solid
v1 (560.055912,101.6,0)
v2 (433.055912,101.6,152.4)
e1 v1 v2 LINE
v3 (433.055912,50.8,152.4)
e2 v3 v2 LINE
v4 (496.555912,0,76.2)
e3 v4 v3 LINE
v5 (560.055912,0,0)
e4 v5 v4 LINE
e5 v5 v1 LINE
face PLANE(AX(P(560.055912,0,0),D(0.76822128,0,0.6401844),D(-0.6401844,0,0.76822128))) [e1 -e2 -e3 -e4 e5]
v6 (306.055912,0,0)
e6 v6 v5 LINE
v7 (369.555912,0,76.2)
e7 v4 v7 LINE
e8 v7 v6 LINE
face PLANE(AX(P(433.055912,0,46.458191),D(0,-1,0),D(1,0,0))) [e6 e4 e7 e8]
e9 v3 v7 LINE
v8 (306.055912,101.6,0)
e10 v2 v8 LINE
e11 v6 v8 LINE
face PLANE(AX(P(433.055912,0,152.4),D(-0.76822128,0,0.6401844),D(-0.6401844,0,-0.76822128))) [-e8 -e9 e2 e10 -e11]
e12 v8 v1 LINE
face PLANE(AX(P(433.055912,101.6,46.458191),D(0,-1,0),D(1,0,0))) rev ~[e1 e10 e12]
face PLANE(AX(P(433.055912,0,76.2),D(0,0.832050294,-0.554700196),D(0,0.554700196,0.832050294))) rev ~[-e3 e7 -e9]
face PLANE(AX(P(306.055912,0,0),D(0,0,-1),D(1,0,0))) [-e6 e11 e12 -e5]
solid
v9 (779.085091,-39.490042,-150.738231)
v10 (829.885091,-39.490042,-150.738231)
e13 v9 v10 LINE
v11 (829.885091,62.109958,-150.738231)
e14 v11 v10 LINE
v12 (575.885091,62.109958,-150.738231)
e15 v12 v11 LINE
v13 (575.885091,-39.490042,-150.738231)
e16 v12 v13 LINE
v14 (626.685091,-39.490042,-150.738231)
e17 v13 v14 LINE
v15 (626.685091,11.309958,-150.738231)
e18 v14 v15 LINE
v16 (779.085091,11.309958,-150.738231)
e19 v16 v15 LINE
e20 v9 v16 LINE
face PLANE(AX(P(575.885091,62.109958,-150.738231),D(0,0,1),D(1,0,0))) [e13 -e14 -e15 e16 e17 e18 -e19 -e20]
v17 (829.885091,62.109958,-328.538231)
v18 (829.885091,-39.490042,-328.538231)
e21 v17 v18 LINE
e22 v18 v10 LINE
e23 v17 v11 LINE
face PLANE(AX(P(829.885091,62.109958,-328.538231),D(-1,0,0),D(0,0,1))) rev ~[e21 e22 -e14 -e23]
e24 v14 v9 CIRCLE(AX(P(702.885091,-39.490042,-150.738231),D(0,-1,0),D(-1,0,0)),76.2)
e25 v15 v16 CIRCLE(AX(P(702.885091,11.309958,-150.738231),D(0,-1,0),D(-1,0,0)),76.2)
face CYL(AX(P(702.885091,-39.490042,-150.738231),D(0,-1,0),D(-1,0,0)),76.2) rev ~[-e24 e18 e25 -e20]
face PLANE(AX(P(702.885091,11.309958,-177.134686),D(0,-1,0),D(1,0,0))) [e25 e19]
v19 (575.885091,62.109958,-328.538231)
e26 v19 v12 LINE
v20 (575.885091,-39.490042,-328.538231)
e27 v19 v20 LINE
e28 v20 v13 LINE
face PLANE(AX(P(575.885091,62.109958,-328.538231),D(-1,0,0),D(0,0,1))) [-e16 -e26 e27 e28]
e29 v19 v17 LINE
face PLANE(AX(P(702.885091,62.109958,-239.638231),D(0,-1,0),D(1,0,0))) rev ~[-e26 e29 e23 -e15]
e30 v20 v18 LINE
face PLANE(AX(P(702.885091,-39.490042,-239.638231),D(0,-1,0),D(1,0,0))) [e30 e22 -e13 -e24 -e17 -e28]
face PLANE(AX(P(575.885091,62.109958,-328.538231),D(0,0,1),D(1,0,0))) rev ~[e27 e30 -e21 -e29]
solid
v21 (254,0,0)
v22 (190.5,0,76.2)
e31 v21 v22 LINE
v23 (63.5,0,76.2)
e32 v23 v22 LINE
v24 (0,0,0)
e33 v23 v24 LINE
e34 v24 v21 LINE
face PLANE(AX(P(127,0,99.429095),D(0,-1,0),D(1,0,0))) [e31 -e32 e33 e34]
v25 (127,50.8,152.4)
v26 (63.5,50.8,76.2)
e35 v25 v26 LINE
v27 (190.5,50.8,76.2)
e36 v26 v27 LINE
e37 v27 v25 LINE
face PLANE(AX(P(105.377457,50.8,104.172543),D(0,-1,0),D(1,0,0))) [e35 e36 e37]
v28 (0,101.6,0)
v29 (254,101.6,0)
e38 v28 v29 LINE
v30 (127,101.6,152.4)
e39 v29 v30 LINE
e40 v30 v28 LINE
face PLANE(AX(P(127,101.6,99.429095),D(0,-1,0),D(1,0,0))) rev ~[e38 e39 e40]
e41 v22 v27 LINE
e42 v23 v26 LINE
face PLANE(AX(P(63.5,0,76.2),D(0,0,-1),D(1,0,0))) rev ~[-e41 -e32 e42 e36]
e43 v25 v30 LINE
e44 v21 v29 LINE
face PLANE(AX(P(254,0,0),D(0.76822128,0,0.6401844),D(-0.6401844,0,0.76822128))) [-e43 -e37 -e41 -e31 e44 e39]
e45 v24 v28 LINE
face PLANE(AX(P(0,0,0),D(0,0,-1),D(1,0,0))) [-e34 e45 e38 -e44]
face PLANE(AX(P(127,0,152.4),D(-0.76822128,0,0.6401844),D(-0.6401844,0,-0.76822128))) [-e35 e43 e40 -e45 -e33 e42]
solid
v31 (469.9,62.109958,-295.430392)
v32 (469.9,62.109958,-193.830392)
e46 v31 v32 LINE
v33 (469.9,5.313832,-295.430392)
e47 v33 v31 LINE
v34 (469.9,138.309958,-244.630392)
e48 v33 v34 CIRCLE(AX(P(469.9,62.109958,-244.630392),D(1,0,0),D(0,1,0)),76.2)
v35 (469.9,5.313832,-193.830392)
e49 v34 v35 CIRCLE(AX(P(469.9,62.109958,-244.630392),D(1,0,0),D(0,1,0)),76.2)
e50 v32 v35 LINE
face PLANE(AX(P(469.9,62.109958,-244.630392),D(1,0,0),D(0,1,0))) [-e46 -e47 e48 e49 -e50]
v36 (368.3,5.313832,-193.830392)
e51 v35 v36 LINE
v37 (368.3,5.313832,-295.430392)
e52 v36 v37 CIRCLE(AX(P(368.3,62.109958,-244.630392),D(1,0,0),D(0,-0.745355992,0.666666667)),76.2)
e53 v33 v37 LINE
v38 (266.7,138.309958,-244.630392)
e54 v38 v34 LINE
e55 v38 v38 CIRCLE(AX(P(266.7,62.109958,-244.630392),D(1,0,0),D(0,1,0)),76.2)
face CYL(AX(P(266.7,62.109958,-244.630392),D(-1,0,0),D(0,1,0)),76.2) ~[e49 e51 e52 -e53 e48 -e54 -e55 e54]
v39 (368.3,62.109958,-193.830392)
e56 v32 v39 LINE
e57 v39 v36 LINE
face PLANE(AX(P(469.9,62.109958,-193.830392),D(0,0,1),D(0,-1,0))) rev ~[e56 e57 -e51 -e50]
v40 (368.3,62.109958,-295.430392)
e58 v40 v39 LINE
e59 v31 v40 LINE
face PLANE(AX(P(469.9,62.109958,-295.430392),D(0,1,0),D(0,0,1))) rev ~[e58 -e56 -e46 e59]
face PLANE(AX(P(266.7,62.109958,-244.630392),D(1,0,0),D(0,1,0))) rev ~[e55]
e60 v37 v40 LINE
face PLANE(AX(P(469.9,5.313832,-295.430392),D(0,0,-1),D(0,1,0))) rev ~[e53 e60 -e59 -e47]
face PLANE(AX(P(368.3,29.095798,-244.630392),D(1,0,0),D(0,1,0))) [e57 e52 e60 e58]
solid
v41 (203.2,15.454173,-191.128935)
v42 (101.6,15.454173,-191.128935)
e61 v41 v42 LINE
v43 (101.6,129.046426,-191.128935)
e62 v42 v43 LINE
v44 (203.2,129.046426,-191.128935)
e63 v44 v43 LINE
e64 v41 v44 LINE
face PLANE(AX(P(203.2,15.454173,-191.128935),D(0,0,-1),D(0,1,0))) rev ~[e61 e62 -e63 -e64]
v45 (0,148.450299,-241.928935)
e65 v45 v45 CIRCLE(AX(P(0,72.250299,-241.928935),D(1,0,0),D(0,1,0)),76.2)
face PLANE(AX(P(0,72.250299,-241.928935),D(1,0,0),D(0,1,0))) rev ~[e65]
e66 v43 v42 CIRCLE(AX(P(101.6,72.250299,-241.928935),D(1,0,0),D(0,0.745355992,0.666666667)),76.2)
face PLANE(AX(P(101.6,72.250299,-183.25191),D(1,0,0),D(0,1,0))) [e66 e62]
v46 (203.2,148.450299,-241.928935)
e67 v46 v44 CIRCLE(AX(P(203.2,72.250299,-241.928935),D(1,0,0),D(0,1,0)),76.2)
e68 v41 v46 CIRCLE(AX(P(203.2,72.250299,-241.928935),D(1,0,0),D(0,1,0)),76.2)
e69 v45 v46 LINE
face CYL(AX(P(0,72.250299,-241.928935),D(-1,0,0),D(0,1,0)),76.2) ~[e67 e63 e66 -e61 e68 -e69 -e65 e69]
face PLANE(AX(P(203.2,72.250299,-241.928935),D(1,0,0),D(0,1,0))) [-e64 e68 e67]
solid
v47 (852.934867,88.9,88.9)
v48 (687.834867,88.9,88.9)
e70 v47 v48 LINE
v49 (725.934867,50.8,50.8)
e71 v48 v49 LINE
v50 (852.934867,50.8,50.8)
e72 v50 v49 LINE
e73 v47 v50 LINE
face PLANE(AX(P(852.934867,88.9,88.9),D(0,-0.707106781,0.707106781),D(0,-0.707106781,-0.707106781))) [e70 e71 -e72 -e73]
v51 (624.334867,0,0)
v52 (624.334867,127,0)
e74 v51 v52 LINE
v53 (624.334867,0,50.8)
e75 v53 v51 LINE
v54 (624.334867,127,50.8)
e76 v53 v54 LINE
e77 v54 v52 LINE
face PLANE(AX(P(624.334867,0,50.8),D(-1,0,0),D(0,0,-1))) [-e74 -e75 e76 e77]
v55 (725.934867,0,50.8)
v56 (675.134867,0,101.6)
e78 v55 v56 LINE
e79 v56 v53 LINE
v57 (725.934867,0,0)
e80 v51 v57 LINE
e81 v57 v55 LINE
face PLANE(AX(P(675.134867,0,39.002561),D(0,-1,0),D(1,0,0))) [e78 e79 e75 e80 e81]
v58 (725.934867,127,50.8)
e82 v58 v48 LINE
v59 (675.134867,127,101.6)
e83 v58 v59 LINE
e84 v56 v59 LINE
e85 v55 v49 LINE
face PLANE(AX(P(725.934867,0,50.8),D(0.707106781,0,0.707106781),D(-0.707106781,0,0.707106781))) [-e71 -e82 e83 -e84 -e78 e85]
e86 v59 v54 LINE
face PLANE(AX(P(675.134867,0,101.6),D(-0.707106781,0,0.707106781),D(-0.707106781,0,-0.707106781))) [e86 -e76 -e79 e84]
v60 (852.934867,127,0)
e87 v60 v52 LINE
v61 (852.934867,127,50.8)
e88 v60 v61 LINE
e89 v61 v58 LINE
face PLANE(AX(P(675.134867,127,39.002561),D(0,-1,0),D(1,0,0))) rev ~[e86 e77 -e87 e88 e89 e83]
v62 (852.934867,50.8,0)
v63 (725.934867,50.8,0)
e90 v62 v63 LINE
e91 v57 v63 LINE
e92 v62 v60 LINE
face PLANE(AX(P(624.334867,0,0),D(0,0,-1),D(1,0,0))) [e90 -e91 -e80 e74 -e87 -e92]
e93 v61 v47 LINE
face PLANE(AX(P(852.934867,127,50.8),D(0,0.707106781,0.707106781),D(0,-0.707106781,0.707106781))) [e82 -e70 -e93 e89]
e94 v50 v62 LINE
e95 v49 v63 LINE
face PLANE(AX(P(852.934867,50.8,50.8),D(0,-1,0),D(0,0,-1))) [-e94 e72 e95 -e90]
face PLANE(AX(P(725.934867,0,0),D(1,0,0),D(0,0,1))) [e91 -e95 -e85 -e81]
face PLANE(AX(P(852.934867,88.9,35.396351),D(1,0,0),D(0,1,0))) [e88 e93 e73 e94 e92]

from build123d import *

# Parameters (mm, degrees)
F1_DEPTH  = 101.6
F3_DEPTH  = 50.8
F5_DEPTH  = 101.6
F9_DEPTH  = 63.5
F11_DEPTH = 127
F15_R     = 76.2
F16_DEPTH = 203.2
F18_DEPTH = 101.6
F20_R     = 76.2
F21_DEPTH = 203.2
F23_DEPTH = 101.6
F24_W     = 254
F24_H     = 177.8
F25_DEPTH = 101.6
F27_DEPTH = 50.8


# Not quite as in the source:
# - a feature names something its author has since deleted; it is built from what else it names


with BuildPart() as f1:
    # F0 (on Front) → F1 (new body)
    with BuildSketch(Plane.XZ):
        Polygon((63.5, 76.2), (190.5, 76.2), (127, 152.4), align=None)
        Polygon((0, 0), (254, 0), (190.5, 76.2), (63.5, 76.2), align=None)
    extrude(amount=-F1_DEPTH)

    # F2 (on face) → F3 (cut)
    with BuildSketch(Plane.XZ):
        Polygon((127, 76.2), (127, 152.4), (63.5, 76.2), align=None)
        Polygon((190.5, 76.2), (127, 152.4), (127, 76.2), align=None)
    extrude(amount=-F3_DEPTH, mode=Mode.SUBTRACT)


with BuildPart() as f5:
    # F4 (on face) → F5 (new body)
    with BuildSketch(Plane.XZ):
        Polygon((306.055911541, 0), (560.055911541, 0), (433.055911541, 152.4), align=None)
    extrude(amount=-F5_DEPTH)

    # F8 (on 3pt) → F9 (cut, symmetric)
    with BuildSketch(Plane.YZ.offset(433.055911541)):
        Polygon((50.8, 152.4), (0, 152.4), (0, 76.2), align=None)
    extrude(amount=F9_DEPTH, both=True, mode=Mode.SUBTRACT)


with BuildPart() as f11:
    # F10 (on face) → F11 (new body)
    with BuildSketch(Plane.XZ):
        Polygon((675.1348665619, 101.6), (624.3348665619, 50.8), (624.3348665619, 0), (725.9348665619, 0), (725.9348665619, 50.8), align=None)
    extrude(amount=-F11_DEPTH)

    # F13 (on offset) → F14 (join, up to the next surface of F11)
    with BuildSketch(Plane.YZ.offset(852.9348665619)):
        Polygon((50.8, 50.8), (50.8, 0), (127, 0), (127, 50.8), (88.9, 88.9), align=None)
    extrude(until=Until.NEXT, dir=(-1, 0, 0))


with BuildPart() as f16:
    # F15 (on Right) → F16 (new body)
    with BuildSketch(Plane.YZ):
        with Locations((72.2502991557, -241.928935051)):
            Circle(F15_R)
    extrude(amount=F16_DEPTH)

    # F17 (on face) → F18 (cut)
    with BuildSketch(Plane.YZ.offset(203.2)):
        with BuildLine():
            ThreePointArc((129.0464257842, -191.128935051), (72.2502991557, -165.728935051), (15.4541725272, -191.128935051))
            Line((15.4541725272, -191.128935051), (129.0464257842, -191.128935051))
        make_face()
    extrude(amount=-F18_DEPTH, mode=Mode.SUBTRACT)


with BuildPart() as f21:
    # F20 (on offset) → F21 (new body)
    with BuildSketch(Plane.YZ.offset(266.7)):
        with Locations((62.1099583805, -244.6303920269)):
            Circle(F20_R)
    extrude(amount=F21_DEPTH)

    # F22 (on face) → F23 (cut)
    with BuildSketch(Plane.YZ.offset(469.9)):
        with BuildLine():
            Line((5.313831752, -295.4303920269), (62.1099583805, -295.4303920269))
            Line((62.1099583805, -295.4303920269), (62.1099583805, -244.6303920269))
            Line((62.1099583805, -244.6303920269), (62.1099583805, -193.8303920269))
            Line((62.1099583805, -193.8303920269), (5.313831752, -193.8303920269))
            ThreePointArc((5.313831752, -193.8303920269), (-14.0900416195, -244.6303920269), (5.313831752, -295.4303920269))
        make_face()
    extrude(amount=-F23_DEPTH, mode=Mode.SUBTRACT)


with BuildPart() as f25:
    # F24 (on face) → F25 (new body)
    with BuildSketch(Plane.XZ.offset(-62.1099583805)):
        with Locations((702.8850913048, -239.6382312099)):
            Rectangle(F24_W, F24_H)
    extrude(amount=F25_DEPTH)

    # F26 (on face) → F27 (cut)
    with BuildSketch(Plane.XZ.offset(39.4900416195)):
        with BuildLine():
            Line((779.0850913048, -150.7382312099), (626.6850913048, -150.7382312099))
            ThreePointArc((626.6850913048, -150.7382312099), (702.8850913048, -226.9382312099), (779.0850913048, -150.7382312099))
        make_face()
    extrude(amount=-F27_DEPTH, mode=Mode.SUBTRACT)


solid = Compound([f1.part, f5.part, f11.part, f16.part, f21.part, f25.part])
